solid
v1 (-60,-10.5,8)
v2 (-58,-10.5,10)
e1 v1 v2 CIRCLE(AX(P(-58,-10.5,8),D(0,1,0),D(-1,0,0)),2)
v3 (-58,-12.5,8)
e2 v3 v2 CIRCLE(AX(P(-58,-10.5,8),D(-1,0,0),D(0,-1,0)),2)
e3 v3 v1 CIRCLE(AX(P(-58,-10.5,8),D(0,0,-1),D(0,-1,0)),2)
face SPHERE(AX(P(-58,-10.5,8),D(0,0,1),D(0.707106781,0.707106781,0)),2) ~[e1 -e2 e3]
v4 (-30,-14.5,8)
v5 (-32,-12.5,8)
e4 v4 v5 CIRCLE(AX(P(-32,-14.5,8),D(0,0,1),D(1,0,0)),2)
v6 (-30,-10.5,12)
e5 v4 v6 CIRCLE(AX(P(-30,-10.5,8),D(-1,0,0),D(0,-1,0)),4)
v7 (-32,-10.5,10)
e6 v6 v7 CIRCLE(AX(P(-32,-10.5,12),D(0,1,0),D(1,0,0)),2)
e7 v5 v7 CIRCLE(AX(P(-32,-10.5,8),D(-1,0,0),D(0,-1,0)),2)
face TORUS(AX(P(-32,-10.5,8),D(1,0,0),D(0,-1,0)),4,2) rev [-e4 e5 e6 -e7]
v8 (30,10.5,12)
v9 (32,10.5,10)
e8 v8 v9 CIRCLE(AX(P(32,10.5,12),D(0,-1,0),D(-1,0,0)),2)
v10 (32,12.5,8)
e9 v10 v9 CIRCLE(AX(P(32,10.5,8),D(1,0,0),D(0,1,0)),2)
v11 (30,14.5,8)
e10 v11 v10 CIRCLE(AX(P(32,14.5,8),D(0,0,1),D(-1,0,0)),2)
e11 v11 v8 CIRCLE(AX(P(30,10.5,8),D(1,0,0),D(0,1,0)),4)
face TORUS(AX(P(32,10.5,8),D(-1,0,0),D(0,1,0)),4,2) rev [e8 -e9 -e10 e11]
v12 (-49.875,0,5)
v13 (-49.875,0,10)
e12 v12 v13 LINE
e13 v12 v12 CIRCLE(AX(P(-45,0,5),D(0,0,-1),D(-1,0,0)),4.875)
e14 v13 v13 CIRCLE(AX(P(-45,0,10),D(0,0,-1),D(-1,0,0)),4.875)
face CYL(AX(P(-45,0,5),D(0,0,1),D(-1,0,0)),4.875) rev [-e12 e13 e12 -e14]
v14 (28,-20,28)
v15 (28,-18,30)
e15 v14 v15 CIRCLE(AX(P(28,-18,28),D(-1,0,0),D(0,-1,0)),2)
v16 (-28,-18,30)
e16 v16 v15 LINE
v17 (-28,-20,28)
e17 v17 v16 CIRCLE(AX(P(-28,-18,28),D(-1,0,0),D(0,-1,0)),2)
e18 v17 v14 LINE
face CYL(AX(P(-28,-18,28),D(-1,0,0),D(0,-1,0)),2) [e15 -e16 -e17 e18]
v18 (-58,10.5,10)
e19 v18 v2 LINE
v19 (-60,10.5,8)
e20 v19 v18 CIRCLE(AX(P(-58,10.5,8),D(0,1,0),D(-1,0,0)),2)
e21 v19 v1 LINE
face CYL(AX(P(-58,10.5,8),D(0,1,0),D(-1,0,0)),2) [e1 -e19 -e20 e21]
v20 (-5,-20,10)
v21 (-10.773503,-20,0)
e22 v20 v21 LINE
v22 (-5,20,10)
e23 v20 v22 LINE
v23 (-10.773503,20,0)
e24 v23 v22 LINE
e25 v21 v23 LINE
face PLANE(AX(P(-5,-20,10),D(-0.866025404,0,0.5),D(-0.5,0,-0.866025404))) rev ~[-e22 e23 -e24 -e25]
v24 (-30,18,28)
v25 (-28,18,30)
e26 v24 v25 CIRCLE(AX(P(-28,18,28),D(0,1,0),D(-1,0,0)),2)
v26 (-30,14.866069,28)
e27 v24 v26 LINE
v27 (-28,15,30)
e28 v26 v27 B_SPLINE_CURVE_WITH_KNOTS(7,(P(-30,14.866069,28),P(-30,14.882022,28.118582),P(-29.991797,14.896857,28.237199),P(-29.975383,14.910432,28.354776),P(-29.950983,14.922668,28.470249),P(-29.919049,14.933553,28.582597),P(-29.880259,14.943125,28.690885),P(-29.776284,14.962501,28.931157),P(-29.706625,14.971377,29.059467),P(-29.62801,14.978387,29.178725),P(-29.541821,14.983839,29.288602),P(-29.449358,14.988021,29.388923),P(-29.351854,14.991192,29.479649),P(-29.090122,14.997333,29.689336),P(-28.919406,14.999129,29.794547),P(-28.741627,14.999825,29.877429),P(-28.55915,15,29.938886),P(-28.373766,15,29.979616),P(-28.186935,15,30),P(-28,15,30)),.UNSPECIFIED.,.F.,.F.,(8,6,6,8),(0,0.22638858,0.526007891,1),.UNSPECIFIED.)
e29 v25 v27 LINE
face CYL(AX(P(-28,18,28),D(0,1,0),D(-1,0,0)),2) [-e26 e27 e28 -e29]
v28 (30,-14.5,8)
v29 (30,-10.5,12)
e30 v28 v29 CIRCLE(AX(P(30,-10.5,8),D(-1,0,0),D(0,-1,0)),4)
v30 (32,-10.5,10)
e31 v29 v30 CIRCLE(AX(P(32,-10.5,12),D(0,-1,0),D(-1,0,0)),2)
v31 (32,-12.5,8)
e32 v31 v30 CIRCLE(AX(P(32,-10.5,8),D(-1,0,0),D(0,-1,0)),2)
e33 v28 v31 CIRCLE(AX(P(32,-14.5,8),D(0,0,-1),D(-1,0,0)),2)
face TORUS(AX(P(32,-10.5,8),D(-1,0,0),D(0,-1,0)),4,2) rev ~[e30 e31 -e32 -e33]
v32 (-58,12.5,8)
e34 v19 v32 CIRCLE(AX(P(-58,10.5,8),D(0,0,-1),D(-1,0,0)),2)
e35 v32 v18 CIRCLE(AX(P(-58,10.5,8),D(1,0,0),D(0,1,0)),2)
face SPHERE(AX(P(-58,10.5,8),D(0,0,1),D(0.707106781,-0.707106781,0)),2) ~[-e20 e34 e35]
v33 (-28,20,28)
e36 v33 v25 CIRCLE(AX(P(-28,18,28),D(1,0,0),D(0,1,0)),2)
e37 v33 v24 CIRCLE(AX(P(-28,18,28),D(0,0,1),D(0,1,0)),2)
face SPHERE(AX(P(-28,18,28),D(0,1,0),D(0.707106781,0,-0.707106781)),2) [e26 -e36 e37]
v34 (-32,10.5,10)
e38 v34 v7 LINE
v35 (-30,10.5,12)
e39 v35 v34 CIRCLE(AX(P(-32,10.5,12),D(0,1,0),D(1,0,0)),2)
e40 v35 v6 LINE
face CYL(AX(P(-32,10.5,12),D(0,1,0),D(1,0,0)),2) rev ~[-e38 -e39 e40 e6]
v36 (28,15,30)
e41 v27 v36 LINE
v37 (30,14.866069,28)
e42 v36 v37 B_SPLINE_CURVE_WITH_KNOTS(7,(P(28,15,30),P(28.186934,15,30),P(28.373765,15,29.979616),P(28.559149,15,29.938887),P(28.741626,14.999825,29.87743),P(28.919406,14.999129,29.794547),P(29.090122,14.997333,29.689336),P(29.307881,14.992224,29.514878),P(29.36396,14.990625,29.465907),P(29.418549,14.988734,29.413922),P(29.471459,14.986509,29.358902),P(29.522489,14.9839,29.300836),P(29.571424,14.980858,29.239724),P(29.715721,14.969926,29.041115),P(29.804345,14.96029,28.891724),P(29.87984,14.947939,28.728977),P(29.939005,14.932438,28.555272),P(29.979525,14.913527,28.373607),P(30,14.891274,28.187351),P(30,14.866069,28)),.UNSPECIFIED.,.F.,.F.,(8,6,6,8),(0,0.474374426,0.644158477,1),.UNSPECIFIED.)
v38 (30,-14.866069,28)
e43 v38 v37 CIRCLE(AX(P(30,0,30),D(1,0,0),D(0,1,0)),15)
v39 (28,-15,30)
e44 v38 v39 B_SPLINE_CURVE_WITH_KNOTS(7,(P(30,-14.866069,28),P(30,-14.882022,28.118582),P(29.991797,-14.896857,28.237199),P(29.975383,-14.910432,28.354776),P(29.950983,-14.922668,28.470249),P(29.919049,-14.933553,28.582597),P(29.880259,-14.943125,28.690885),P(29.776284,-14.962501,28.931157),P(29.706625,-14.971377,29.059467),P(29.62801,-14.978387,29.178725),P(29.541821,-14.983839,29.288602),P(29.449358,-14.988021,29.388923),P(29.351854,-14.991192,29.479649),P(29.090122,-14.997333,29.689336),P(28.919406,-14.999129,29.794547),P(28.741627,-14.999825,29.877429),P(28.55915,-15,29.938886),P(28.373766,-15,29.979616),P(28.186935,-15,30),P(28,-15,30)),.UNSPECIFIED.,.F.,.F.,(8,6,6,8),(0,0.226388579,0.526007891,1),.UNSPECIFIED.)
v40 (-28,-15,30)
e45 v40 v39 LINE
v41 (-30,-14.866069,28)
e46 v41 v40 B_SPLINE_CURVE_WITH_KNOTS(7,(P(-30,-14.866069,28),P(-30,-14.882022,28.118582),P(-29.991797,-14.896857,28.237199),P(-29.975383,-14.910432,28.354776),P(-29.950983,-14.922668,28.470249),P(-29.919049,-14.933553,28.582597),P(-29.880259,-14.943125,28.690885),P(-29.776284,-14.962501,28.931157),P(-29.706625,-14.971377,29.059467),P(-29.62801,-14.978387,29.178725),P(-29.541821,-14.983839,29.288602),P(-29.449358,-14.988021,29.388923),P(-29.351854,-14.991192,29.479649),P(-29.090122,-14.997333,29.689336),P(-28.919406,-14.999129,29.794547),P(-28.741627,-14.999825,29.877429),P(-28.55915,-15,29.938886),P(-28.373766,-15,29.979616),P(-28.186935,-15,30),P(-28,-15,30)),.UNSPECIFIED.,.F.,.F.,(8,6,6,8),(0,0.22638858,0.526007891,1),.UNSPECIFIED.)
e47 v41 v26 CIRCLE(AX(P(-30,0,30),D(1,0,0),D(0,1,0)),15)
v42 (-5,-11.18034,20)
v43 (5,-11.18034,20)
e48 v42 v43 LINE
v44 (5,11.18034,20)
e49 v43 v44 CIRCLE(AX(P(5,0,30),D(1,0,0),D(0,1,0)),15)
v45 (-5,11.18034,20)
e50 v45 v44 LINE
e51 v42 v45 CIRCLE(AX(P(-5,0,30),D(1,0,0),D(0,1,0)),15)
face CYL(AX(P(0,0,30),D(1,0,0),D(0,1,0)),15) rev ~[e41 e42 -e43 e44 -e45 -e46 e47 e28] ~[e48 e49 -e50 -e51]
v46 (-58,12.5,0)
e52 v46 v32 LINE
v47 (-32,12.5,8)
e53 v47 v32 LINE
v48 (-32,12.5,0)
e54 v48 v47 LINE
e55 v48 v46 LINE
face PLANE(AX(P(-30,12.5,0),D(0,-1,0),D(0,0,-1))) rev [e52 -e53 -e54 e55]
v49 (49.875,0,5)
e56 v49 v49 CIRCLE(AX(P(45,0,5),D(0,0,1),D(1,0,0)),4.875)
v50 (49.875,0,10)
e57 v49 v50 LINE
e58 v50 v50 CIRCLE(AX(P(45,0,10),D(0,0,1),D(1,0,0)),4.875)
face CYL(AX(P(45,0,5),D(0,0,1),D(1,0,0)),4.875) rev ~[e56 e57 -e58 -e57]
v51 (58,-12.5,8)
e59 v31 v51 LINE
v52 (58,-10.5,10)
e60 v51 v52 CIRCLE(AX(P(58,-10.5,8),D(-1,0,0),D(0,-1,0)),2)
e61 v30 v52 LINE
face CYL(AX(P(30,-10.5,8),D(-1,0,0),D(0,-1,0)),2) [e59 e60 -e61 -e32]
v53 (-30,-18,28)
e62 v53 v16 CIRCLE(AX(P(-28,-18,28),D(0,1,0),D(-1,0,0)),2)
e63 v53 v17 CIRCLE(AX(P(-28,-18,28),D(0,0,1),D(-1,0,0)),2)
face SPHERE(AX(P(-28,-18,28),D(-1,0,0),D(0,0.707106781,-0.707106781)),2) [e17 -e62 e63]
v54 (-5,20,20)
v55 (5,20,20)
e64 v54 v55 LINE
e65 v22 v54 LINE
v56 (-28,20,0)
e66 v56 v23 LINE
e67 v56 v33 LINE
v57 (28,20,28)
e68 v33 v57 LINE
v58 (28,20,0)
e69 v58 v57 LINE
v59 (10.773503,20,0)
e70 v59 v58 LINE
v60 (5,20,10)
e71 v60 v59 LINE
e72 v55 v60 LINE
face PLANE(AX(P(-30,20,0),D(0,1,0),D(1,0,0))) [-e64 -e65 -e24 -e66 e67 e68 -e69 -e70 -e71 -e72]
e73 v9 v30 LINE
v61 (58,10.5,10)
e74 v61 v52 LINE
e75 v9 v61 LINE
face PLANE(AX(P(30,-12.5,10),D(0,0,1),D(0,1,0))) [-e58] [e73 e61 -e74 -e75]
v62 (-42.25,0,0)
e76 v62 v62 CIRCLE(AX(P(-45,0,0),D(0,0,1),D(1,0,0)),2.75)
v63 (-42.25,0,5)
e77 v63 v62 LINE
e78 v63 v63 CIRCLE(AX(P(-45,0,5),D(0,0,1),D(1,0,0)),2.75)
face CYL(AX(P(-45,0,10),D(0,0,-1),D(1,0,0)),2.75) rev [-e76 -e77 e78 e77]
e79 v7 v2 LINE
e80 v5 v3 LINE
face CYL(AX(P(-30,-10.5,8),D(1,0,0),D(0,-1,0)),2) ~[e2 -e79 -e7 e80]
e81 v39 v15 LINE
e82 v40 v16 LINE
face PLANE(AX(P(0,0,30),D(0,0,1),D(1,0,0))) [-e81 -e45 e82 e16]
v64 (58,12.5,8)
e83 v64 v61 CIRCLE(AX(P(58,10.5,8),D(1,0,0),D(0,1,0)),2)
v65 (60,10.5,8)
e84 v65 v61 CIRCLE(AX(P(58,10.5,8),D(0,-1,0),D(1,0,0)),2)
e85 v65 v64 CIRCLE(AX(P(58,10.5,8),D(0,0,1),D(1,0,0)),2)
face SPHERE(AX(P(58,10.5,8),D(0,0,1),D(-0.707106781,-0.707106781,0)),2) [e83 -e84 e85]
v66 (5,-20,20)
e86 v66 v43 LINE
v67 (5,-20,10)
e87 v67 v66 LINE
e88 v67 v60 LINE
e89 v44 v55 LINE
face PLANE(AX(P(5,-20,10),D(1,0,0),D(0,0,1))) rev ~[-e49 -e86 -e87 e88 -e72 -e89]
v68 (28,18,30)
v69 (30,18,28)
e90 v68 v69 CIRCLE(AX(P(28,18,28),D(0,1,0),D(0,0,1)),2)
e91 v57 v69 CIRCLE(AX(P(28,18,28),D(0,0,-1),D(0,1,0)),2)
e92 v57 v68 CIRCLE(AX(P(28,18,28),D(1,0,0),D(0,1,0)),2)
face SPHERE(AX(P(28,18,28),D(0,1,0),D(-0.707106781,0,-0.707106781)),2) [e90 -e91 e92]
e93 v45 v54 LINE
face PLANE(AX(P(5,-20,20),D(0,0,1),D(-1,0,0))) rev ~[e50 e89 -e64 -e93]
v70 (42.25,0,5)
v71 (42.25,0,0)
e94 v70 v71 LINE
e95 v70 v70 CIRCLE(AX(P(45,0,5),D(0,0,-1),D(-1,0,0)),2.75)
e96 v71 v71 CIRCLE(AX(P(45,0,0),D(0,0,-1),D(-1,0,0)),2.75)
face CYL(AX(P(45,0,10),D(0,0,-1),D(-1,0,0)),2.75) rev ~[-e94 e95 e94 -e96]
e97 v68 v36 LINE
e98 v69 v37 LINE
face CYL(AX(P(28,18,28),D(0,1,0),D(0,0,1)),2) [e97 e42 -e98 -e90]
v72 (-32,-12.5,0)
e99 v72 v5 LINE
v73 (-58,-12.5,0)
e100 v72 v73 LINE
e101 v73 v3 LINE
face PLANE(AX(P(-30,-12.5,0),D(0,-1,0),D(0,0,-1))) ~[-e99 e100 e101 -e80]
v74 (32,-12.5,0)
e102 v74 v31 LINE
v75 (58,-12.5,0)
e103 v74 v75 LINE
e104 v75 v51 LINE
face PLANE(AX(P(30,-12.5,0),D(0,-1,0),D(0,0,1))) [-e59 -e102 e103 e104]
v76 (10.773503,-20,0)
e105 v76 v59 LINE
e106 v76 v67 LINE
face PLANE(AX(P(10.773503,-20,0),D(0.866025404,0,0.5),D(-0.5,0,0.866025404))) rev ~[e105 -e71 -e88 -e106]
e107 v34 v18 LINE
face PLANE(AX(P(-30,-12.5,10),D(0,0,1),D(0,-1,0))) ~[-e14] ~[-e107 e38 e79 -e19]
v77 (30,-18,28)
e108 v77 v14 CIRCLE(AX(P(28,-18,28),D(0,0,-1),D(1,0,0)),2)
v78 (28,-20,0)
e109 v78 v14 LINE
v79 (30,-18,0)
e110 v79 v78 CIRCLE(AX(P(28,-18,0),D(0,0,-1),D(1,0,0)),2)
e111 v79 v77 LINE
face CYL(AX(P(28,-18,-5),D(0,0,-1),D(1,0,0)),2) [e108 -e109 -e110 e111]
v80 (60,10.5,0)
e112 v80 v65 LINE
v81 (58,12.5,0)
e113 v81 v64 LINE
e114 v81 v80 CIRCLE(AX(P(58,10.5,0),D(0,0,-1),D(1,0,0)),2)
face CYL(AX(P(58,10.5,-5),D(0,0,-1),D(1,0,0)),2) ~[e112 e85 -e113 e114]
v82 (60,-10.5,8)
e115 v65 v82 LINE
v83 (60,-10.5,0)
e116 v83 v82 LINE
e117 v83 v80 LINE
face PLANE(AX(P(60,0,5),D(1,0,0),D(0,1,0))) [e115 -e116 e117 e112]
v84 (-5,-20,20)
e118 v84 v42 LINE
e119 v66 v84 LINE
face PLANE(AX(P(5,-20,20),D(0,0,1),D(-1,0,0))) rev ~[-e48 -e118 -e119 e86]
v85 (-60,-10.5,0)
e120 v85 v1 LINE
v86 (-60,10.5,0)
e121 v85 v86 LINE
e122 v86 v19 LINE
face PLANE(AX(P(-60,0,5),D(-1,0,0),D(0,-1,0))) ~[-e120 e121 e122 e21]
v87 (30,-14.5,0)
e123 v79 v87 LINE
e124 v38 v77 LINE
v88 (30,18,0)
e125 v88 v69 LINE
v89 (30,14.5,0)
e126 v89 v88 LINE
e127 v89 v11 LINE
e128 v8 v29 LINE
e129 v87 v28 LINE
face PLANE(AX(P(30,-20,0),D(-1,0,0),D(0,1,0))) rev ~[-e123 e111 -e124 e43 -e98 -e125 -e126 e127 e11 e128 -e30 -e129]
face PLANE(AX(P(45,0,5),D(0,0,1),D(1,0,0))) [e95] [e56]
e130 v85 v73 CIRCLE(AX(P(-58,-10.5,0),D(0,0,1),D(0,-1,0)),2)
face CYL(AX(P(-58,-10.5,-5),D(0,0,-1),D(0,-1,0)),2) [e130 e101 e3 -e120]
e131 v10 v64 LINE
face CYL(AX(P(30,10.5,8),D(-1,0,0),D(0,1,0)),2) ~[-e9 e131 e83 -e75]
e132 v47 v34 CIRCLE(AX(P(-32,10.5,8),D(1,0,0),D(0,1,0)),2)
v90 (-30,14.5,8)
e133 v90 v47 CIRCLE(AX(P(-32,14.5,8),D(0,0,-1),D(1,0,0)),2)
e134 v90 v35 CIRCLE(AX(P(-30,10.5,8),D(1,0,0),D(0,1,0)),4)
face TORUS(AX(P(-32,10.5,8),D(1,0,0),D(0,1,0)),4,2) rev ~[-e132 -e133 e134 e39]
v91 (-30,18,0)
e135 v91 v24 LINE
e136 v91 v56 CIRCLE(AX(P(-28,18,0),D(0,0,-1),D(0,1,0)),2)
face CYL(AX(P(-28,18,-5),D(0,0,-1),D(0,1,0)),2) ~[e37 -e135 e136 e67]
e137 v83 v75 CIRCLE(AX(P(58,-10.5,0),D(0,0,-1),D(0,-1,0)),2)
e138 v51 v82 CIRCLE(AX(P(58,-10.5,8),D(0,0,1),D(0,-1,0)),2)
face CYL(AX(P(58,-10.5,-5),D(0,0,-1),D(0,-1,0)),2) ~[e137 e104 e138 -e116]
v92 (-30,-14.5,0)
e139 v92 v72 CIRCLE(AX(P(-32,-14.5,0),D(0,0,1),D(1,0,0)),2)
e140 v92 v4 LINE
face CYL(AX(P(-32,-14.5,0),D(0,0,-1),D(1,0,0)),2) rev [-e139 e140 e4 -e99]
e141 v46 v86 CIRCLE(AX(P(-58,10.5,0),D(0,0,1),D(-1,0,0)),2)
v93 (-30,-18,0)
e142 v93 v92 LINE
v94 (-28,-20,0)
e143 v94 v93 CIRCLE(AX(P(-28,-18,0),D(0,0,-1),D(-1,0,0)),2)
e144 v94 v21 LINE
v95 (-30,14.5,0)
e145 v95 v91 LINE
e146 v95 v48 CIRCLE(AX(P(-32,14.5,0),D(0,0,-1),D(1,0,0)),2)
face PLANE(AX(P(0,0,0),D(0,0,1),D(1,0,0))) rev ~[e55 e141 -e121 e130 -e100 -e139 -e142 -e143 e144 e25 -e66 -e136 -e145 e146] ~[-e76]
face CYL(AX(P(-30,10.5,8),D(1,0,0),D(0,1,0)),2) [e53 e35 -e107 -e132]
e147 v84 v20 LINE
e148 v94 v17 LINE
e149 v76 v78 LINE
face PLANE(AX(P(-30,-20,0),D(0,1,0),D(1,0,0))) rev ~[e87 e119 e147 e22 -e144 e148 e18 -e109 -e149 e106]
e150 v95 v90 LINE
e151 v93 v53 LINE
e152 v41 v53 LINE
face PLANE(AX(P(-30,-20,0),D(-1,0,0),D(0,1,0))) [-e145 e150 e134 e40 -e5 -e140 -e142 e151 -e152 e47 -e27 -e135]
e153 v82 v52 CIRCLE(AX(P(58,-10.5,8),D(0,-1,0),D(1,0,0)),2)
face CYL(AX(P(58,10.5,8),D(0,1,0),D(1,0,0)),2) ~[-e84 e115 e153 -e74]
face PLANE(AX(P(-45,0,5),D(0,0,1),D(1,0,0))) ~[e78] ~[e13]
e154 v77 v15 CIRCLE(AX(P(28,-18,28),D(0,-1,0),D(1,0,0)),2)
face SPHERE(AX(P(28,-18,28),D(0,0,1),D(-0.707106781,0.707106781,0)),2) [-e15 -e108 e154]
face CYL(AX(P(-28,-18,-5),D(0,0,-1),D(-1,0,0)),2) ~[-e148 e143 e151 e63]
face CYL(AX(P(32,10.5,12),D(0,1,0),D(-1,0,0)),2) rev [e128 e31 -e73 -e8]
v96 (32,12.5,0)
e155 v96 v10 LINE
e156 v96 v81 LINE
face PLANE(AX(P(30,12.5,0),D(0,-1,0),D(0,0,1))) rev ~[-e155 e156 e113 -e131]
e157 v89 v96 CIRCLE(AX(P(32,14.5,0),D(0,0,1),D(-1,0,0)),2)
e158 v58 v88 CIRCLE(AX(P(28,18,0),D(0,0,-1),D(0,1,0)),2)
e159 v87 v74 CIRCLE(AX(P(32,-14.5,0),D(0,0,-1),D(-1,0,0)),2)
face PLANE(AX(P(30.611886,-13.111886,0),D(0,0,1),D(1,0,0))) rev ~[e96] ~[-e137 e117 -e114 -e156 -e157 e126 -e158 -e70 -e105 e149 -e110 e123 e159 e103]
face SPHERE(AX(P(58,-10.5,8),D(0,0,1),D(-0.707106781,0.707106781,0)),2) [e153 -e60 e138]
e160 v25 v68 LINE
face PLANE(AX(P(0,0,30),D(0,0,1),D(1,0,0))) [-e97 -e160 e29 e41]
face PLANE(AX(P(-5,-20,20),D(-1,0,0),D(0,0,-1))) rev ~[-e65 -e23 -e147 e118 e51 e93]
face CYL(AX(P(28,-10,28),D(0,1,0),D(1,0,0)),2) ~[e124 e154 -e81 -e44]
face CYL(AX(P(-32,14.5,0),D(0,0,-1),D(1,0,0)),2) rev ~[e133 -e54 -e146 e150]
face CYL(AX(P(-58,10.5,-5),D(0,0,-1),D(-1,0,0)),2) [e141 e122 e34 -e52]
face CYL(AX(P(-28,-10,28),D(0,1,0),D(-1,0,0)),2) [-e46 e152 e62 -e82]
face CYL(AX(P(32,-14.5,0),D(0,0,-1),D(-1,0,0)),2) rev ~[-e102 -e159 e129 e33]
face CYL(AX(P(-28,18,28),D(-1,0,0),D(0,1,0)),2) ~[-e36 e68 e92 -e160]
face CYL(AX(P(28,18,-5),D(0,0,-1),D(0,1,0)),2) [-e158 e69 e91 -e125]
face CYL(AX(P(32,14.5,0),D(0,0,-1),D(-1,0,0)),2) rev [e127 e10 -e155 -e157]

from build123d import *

# Parameters (mm, degrees)
F0_W           = 60
F0_H           = 40
F1_DEPTH       = 30
F3_DEPTH       = 40.001
F4_R           = 15
F5_DEPTH       = 40
F6_W           = 25
F6_H           = 10
F7_DEPTH       = 30
F9_D           = 5.5
F9_CBORE_D     = 9.75
F9_CBORE_DEPTH = 5
F10_T1_DEPTH   = 13
F10_T3_DEPTH   = 28
F10_T5_DEPTH   = 21
F10_T7_DEPTH   = 33
F10_T9_DEPTH   = 8
F10_T11_DEPTH  = 56
F10_T13_DEPTH  = 8
F10_S17_W      = 2
F10_S17_H      = 2
F10_T18_DEPTH  = 2
F10_S23_W      = 2
F10_S23_H      = 2
F10_T24_DEPTH  = 2
F10_S29_W      = 2
F10_S29_H      = 2
F10_T30_DEPTH  = 2
F10_S35_W      = 2
F10_S35_H      = 2
F10_T36_DEPTH  = 2
F10_S41_W      = 2
F10_S41_H      = 2
F10_T42_DEPTH  = 2
F10_S47_W      = 2
F10_S47_H      = 2
F10_T48_DEPTH  = 2
F10_T51_DEPTH  = 8
F10_T53_DEPTH  = 21
F10_T56_ANGLE  = 90
F10_T58_ANGLE  = 90


# Not quite as in the source:
# - a fillet or chamfer that OpenCascade refuses, or shapes differently, is made with other operations: its cross-section is extruded or revolved along the edge and cut away or added


with BuildPart() as f1:
    # F0 (on Top) → F1 (new body)
    with BuildSketch(Plane.XY):
        Rectangle(F0_W, F0_H)
    extrude(amount=F1_DEPTH)

    # F2 (on face) → F3 (cut, through all)
    with BuildSketch(Plane.XZ.offset(20)):
        Polygon((-5, 10), (-10.7735026919, 0), (10.7735026919, 0), (5, 10), (5, 20), (-5, 20), align=None)
    extrude(amount=-F3_DEPTH, mode=Mode.SUBTRACT)

    # F4 (on Right) → F5 (cut, symmetric)
    with BuildSketch(Plane.YZ):
        with Locations((0, 30)):
            Circle(F4_R)
    extrude(amount=F5_DEPTH, both=True, mode=Mode.SUBTRACT)

    # F6 (on face) → F7 (join)
    with BuildSketch(Plane.YZ.offset(30)):
        with Locations((0, 5)):
            Rectangle(F6_W, F6_H)
    extrude(amount=F7_DEPTH)

    # F9 (through all)
    with Locations(Plane.XY.offset(10)):
        with Locations((45, 0)):
            CounterBoreHole(F9_D / 2, F9_CBORE_D / 2, F9_CBORE_DEPTH)

    # F10: fillet of radius 2 on 18 edges, made by hand

    # F10_s2 → F10_t1 (cut)
    with BuildSketch(Plane.XY.offset(-5)):
        with BuildLine():
            ThreePointArc((58, -12.5), (59.4142135624, -11.9142135624), (60, -10.5))
            Line((60, -10.5), (60, -12.5))
            Line((60, -12.5), (58, -12.5))
        make_face()
        with BuildLine():
            ThreePointArc((60, 10.5), (59.4142135624, 11.9142135624), (58, 12.5))
            Line((58, 12.5), (60, 12.5))
            Line((60, 12.5), (60, 10.5))
        make_face()
    extrude(amount=F10_T1_DEPTH, mode=Mode.SUBTRACT)

    # F10_s4 → F10_t3 (cut)
    with BuildSketch(Plane.YZ.offset(30)):
        with BuildLine():
            ThreePointArc((-12.5, 8), (-11.9142135624, 9.4142135624), (-10.5, 10))
            Line((-10.5, 10), (-12.5, 10))
            Line((-12.5, 10), (-12.5, 8))
        make_face()
        with BuildLine():
            ThreePointArc((12.5, 8), (11.9142135624, 9.4142135624), (10.5, 10))
            Line((10.5, 10), (12.5, 10))
            Line((12.5, 10), (12.5, 8))
        make_face()
    extrude(amount=F10_T3_DEPTH, mode=Mode.SUBTRACT)

    # F10_s6 → F10_t5 (cut)
    with BuildSketch(Plane.XZ.offset(-10.5)):
        with BuildLine():
            ThreePointArc((60, 8), (59.4142135624, 9.4142135624), (58, 10))
            Line((58, 10), (60, 10))
            Line((60, 10), (60, 8))
        make_face()
    extrude(amount=F10_T5_DEPTH, mode=Mode.SUBTRACT)

    # F10_s8 → F10_t7 (cut)
    with BuildSketch(Plane.XY.offset(-5)):
        with BuildLine():
            ThreePointArc((30, -18), (29.4142135624, -19.4142135624), (28, -20))
            Line((28, -20), (30, -20))
            Line((30, -20), (30, -18))
        make_face()
        with BuildLine():
            ThreePointArc((28, 20), (29.4142135624, 19.4142135624), (30, 18))
            Line((30, 18), (30, 20))
            Line((30, 20), (28, 20))
        make_face()
        with BuildLine():
            ThreePointArc((-30, -18), (-29.4142135624, -19.4142135624), (-28, -20))
            Line((-28, -20), (-30, -20))
            Line((-30, -20), (-30, -18))
        make_face()
        with BuildLine():
            ThreePointArc((-28, 20), (-29.4142135624, 19.4142135624), (-30, 18))
            Line((-30, 18), (-30, 20))
            Line((-30, 20), (-28, 20))
        make_face()
    extrude(amount=F10_T7_DEPTH, mode=Mode.SUBTRACT)

    # F10_s10 → F10_t9 (cut)
    with BuildSketch(Plane.XZ.offset(10)):
        with BuildLine():
            ThreePointArc((30, 28), (29.4142135624, 29.4142135624), (28, 30))
            Line((28, 30), (30, 30))
            Line((30, 30), (30, 28))
        make_face()
        with BuildLine():
            ThreePointArc((-30, 28), (-29.4142135624, 29.4142135624), (-28, 30))
            Line((-28, 30), (-30, 30))
            Line((-30, 30), (-30, 28))
        make_face()
    extrude(amount=F10_T9_DEPTH, mode=Mode.SUBTRACT)

    # F10_s12 → F10_t11 (cut)
    with BuildSketch(Plane.YZ.offset(-28)):
        with BuildLine():
            ThreePointArc((20, 28), (19.4142135624, 29.4142135624), (18, 30))
            Line((18, 30), (20, 30))
            Line((20, 30), (20, 28))
        make_face()
        with BuildLine():
            ThreePointArc((-20, 28), (-19.4142135624, 29.4142135624), (-18, 30))
            Line((-18, 30), (-20, 30))
            Line((-20, 30), (-20, 28))
        make_face()
    extrude(amount=F10_T11_DEPTH, mode=Mode.SUBTRACT)

    # F10_s14 → F10_t13 (cut)
    with BuildSketch(Plane.XZ.offset(-18)):
        with BuildLine():
            ThreePointArc((-30, 28), (-29.4142135624, 29.4142135624), (-28, 30))
            Line((-28, 30), (-30, 30))
            Line((-30, 30), (-30, 28))
        make_face()
        with BuildLine():
            ThreePointArc((28, 30), (29.4142135624, 29.4142135624), (30, 28))
            Line((30, 28), (30, 30))
            Line((30, 30), (28, 30))
        make_face()
    extrude(amount=F10_T13_DEPTH, mode=Mode.SUBTRACT)


with BuildPart() as f10_tool16:
    # F10_s17 → F10_t18 (new body)
    with BuildSketch(Plane.XY.offset(8)):
        with Locations((59, -11.5)):
            Rectangle(F10_S17_W, F10_S17_H)
    extrude(amount=F10_T18_DEPTH)

    # F10_s19 → F10_t20 (revolve, cut)
    with BuildSketch(Plane(origin=(58, -10.5, 8), x_dir=(-0.7071067812, 0.7071067812, 0), z_dir=(0.7071067812, 0.7071067812, 0))):
        with BuildLine():
            ThreePointArc((0, -2), (2, 0), (0, 2))
            Line((0, 2), (0, -2))
        make_face()
    revolve(axis=Axis((58, -10.5, 8), (0, 0, 1)), mode=Mode.SUBTRACT)


with BuildPart() as f1_1:
    add(f1.part)

    # F10_t15: cut F10_tool16
    add(f10_tool16.part, mode=Mode.SUBTRACT)


with BuildPart() as f10_tool22:
    # F10_s23 → F10_t24 (new body)
    with BuildSketch(Plane.XY.offset(8)):
        with Locations((59, 11.5)):
            Rectangle(F10_S23_W, F10_S23_H)
    extrude(amount=F10_T24_DEPTH)

    # F10_s25 → F10_t26 (revolve, cut)
    with BuildSketch(Plane(origin=(58, 10.5, 8), x_dir=(-0.7071067812, -0.7071067812, 0), z_dir=(-0.7071067812, 0.7071067812, 0))):
        with BuildLine():
            ThreePointArc((0, -2), (2, 0), (0, 2))
            Line((0, 2), (0, -2))
        make_face()
    revolve(axis=Axis((58, 10.5, 8), (0, 0, 1)), mode=Mode.SUBTRACT)


with BuildPart() as f1_2:
    add(f1_1.part)

    # F10_t21: cut F10_tool22
    add(f10_tool22.part, mode=Mode.SUBTRACT)


with BuildPart() as f10_tool28:
    # F10_s29 → F10_t30 (new body)
    with BuildSketch(Plane.XY.offset(28)):
        with Locations((29, -19)):
            Rectangle(F10_S29_W, F10_S29_H)
    extrude(amount=F10_T30_DEPTH)

    # F10_s31 → F10_t32 (revolve, cut)
    with BuildSketch(Plane(origin=(28, -18, 28), x_dir=(-0.7071067812, 0.7071067812, 0), z_dir=(0.7071067812, 0.7071067812, 0))):
        with BuildLine():
            ThreePointArc((0, -2), (2, 0), (0, 2))
            Line((0, 2), (0, -2))
        make_face()
    revolve(axis=Axis((28, -18, 28), (0, 0, 1)), mode=Mode.SUBTRACT)


with BuildPart() as f1_3:
    add(f1_2.part)

    # F10_t27: cut F10_tool28
    add(f10_tool28.part, mode=Mode.SUBTRACT)


with BuildPart() as f10_tool34:
    # F10_s35 → F10_t36 (new body)
    with BuildSketch(Plane.YZ.offset(-28)):
        with Locations((-19, 29)):
            Rectangle(F10_S35_W, F10_S35_H)
    extrude(amount=-F10_T36_DEPTH)

    # F10_s37 → F10_t38 (revolve, cut)
    with BuildSketch(Plane(origin=(-28, -18, 28), x_dir=(0, 0.7071067812, -0.7071067812), z_dir=(0, 0.7071067812, 0.7071067812))):
        with BuildLine():
            ThreePointArc((0, -2), (2, 0), (0, 2))
            Line((0, 2), (0, -2))
        make_face()
    revolve(axis=Axis((-28, -18, 28), (-1, 0, 0)), mode=Mode.SUBTRACT)


with BuildPart() as f1_4:
    add(f1_3.part)

    # F10_t33: cut F10_tool34
    add(f10_tool34.part, mode=Mode.SUBTRACT)


with BuildPart() as f10_tool40:
    # F10_s41 → F10_t42 (new body)
    with BuildSketch(Plane.XZ.offset(-18)):
        with Locations((29, 29)):
            Rectangle(F10_S41_W, F10_S41_H)
    extrude(amount=-F10_T42_DEPTH)

    # F10_s43 → F10_t44 (revolve, cut)
    with BuildSketch(Plane(origin=(28, 18, 28), x_dir=(-0.7071067812, 0, -0.7071067812), z_dir=(0.7071067812, 0, -0.7071067812))):
        with BuildLine():
            ThreePointArc((0, -2), (2, 0), (0, 2))
            Line((0, 2), (0, -2))
        make_face()
    revolve(axis=Axis((28, 18, 28), (0, 1, 0)), mode=Mode.SUBTRACT)


with BuildPart() as f1_5:
    add(f1_4.part)

    # F10_t39: cut F10_tool40
    add(f10_tool40.part, mode=Mode.SUBTRACT)


with BuildPart() as f10_tool46:
    # F10_s47 → F10_t48 (new body)
    with BuildSketch(Plane.XZ.offset(-18)):
        with Locations((-29, 29)):
            Rectangle(F10_S47_W, F10_S47_H)
    extrude(amount=-F10_T48_DEPTH)

    # F10_s49 → F10_t50 (revolve, cut)
    with BuildSketch(Plane(origin=(-28, 18, 28), x_dir=(0.7071067812, 0, -0.7071067812), z_dir=(0.7071067812, 0, 0.7071067812))):
        with BuildLine():
            ThreePointArc((0, -2), (2, 0), (0, 2))
            Line((0, 2), (0, -2))
        make_face()
    revolve(axis=Axis((-28, 18, 28), (0, 1, 0)), mode=Mode.SUBTRACT)


with BuildPart() as f1_6:
    add(f1_5.part)

    # F10_t45: cut F10_tool46
    add(f10_tool46.part, mode=Mode.SUBTRACT)

    # F10_s52 → F10_t51 (join)
    with BuildSketch(Plane.XY):
        with BuildLine():
            ThreePointArc((30, -14.5), (30.5857864376, -13.0857864376), (32, -12.5))
            Line((32, -12.5), (30, -12.5))
            Line((30, -12.5), (30, -14.5))
        make_face()
        with BuildLine():
            ThreePointArc((30, 14.5), (30.5857864376, 13.0857864376), (32, 12.5))
            Line((32, 12.5), (30, 12.5))
            Line((30, 12.5), (30, 14.5))
        make_face()
    extrude(amount=F10_T51_DEPTH)

    # F10_s54 → F10_t53 (join)
    with BuildSketch(Plane.XZ.offset(-10.5)):
        with BuildLine():
            ThreePointArc((30, 12), (30.5857864376, 10.5857864376), (32, 10))
            Line((32, 10), (30, 10))
            Line((30, 10), (30, 12))
        make_face()
    extrude(amount=F10_T53_DEPTH)

    # F10_s55 → F10_t56 (revolve)
    with BuildSketch(Plane.XY.offset(8)):
        with BuildLine():
            ThreePointArc((30, 14.5), (30.5857864376, 13.0857864376), (32, 12.5))
            Line((32, 12.5), (30, 12.5))
            Line((30, 12.5), (30, 14.5))
        make_face()
    revolve(axis=Axis((30, 10.5, 8), (1, 0, 0)), revolution_arc=F10_T56_ANGLE)

    # F10_s57 → F10_t58 (revolve)
    with BuildSketch(Plane.XY.offset(8)):
        with BuildLine():
            ThreePointArc((30, -14.5), (30.5857864376, -13.0857864376), (32, -12.5))
            Line((32, -12.5), (30, -12.5))
            Line((30, -12.5), (30, -14.5))
        make_face()
    revolve(axis=Axis((30, -10.5, 8), (-1, 0, 0)), revolution_arc=F10_T58_ANGLE)

    # F11: F1 across plane


with BuildPart() as f1_7:
    add(f1_6.part)
    add(f1_6.part.mirror(Plane.YZ))


solid = f1_7.part
